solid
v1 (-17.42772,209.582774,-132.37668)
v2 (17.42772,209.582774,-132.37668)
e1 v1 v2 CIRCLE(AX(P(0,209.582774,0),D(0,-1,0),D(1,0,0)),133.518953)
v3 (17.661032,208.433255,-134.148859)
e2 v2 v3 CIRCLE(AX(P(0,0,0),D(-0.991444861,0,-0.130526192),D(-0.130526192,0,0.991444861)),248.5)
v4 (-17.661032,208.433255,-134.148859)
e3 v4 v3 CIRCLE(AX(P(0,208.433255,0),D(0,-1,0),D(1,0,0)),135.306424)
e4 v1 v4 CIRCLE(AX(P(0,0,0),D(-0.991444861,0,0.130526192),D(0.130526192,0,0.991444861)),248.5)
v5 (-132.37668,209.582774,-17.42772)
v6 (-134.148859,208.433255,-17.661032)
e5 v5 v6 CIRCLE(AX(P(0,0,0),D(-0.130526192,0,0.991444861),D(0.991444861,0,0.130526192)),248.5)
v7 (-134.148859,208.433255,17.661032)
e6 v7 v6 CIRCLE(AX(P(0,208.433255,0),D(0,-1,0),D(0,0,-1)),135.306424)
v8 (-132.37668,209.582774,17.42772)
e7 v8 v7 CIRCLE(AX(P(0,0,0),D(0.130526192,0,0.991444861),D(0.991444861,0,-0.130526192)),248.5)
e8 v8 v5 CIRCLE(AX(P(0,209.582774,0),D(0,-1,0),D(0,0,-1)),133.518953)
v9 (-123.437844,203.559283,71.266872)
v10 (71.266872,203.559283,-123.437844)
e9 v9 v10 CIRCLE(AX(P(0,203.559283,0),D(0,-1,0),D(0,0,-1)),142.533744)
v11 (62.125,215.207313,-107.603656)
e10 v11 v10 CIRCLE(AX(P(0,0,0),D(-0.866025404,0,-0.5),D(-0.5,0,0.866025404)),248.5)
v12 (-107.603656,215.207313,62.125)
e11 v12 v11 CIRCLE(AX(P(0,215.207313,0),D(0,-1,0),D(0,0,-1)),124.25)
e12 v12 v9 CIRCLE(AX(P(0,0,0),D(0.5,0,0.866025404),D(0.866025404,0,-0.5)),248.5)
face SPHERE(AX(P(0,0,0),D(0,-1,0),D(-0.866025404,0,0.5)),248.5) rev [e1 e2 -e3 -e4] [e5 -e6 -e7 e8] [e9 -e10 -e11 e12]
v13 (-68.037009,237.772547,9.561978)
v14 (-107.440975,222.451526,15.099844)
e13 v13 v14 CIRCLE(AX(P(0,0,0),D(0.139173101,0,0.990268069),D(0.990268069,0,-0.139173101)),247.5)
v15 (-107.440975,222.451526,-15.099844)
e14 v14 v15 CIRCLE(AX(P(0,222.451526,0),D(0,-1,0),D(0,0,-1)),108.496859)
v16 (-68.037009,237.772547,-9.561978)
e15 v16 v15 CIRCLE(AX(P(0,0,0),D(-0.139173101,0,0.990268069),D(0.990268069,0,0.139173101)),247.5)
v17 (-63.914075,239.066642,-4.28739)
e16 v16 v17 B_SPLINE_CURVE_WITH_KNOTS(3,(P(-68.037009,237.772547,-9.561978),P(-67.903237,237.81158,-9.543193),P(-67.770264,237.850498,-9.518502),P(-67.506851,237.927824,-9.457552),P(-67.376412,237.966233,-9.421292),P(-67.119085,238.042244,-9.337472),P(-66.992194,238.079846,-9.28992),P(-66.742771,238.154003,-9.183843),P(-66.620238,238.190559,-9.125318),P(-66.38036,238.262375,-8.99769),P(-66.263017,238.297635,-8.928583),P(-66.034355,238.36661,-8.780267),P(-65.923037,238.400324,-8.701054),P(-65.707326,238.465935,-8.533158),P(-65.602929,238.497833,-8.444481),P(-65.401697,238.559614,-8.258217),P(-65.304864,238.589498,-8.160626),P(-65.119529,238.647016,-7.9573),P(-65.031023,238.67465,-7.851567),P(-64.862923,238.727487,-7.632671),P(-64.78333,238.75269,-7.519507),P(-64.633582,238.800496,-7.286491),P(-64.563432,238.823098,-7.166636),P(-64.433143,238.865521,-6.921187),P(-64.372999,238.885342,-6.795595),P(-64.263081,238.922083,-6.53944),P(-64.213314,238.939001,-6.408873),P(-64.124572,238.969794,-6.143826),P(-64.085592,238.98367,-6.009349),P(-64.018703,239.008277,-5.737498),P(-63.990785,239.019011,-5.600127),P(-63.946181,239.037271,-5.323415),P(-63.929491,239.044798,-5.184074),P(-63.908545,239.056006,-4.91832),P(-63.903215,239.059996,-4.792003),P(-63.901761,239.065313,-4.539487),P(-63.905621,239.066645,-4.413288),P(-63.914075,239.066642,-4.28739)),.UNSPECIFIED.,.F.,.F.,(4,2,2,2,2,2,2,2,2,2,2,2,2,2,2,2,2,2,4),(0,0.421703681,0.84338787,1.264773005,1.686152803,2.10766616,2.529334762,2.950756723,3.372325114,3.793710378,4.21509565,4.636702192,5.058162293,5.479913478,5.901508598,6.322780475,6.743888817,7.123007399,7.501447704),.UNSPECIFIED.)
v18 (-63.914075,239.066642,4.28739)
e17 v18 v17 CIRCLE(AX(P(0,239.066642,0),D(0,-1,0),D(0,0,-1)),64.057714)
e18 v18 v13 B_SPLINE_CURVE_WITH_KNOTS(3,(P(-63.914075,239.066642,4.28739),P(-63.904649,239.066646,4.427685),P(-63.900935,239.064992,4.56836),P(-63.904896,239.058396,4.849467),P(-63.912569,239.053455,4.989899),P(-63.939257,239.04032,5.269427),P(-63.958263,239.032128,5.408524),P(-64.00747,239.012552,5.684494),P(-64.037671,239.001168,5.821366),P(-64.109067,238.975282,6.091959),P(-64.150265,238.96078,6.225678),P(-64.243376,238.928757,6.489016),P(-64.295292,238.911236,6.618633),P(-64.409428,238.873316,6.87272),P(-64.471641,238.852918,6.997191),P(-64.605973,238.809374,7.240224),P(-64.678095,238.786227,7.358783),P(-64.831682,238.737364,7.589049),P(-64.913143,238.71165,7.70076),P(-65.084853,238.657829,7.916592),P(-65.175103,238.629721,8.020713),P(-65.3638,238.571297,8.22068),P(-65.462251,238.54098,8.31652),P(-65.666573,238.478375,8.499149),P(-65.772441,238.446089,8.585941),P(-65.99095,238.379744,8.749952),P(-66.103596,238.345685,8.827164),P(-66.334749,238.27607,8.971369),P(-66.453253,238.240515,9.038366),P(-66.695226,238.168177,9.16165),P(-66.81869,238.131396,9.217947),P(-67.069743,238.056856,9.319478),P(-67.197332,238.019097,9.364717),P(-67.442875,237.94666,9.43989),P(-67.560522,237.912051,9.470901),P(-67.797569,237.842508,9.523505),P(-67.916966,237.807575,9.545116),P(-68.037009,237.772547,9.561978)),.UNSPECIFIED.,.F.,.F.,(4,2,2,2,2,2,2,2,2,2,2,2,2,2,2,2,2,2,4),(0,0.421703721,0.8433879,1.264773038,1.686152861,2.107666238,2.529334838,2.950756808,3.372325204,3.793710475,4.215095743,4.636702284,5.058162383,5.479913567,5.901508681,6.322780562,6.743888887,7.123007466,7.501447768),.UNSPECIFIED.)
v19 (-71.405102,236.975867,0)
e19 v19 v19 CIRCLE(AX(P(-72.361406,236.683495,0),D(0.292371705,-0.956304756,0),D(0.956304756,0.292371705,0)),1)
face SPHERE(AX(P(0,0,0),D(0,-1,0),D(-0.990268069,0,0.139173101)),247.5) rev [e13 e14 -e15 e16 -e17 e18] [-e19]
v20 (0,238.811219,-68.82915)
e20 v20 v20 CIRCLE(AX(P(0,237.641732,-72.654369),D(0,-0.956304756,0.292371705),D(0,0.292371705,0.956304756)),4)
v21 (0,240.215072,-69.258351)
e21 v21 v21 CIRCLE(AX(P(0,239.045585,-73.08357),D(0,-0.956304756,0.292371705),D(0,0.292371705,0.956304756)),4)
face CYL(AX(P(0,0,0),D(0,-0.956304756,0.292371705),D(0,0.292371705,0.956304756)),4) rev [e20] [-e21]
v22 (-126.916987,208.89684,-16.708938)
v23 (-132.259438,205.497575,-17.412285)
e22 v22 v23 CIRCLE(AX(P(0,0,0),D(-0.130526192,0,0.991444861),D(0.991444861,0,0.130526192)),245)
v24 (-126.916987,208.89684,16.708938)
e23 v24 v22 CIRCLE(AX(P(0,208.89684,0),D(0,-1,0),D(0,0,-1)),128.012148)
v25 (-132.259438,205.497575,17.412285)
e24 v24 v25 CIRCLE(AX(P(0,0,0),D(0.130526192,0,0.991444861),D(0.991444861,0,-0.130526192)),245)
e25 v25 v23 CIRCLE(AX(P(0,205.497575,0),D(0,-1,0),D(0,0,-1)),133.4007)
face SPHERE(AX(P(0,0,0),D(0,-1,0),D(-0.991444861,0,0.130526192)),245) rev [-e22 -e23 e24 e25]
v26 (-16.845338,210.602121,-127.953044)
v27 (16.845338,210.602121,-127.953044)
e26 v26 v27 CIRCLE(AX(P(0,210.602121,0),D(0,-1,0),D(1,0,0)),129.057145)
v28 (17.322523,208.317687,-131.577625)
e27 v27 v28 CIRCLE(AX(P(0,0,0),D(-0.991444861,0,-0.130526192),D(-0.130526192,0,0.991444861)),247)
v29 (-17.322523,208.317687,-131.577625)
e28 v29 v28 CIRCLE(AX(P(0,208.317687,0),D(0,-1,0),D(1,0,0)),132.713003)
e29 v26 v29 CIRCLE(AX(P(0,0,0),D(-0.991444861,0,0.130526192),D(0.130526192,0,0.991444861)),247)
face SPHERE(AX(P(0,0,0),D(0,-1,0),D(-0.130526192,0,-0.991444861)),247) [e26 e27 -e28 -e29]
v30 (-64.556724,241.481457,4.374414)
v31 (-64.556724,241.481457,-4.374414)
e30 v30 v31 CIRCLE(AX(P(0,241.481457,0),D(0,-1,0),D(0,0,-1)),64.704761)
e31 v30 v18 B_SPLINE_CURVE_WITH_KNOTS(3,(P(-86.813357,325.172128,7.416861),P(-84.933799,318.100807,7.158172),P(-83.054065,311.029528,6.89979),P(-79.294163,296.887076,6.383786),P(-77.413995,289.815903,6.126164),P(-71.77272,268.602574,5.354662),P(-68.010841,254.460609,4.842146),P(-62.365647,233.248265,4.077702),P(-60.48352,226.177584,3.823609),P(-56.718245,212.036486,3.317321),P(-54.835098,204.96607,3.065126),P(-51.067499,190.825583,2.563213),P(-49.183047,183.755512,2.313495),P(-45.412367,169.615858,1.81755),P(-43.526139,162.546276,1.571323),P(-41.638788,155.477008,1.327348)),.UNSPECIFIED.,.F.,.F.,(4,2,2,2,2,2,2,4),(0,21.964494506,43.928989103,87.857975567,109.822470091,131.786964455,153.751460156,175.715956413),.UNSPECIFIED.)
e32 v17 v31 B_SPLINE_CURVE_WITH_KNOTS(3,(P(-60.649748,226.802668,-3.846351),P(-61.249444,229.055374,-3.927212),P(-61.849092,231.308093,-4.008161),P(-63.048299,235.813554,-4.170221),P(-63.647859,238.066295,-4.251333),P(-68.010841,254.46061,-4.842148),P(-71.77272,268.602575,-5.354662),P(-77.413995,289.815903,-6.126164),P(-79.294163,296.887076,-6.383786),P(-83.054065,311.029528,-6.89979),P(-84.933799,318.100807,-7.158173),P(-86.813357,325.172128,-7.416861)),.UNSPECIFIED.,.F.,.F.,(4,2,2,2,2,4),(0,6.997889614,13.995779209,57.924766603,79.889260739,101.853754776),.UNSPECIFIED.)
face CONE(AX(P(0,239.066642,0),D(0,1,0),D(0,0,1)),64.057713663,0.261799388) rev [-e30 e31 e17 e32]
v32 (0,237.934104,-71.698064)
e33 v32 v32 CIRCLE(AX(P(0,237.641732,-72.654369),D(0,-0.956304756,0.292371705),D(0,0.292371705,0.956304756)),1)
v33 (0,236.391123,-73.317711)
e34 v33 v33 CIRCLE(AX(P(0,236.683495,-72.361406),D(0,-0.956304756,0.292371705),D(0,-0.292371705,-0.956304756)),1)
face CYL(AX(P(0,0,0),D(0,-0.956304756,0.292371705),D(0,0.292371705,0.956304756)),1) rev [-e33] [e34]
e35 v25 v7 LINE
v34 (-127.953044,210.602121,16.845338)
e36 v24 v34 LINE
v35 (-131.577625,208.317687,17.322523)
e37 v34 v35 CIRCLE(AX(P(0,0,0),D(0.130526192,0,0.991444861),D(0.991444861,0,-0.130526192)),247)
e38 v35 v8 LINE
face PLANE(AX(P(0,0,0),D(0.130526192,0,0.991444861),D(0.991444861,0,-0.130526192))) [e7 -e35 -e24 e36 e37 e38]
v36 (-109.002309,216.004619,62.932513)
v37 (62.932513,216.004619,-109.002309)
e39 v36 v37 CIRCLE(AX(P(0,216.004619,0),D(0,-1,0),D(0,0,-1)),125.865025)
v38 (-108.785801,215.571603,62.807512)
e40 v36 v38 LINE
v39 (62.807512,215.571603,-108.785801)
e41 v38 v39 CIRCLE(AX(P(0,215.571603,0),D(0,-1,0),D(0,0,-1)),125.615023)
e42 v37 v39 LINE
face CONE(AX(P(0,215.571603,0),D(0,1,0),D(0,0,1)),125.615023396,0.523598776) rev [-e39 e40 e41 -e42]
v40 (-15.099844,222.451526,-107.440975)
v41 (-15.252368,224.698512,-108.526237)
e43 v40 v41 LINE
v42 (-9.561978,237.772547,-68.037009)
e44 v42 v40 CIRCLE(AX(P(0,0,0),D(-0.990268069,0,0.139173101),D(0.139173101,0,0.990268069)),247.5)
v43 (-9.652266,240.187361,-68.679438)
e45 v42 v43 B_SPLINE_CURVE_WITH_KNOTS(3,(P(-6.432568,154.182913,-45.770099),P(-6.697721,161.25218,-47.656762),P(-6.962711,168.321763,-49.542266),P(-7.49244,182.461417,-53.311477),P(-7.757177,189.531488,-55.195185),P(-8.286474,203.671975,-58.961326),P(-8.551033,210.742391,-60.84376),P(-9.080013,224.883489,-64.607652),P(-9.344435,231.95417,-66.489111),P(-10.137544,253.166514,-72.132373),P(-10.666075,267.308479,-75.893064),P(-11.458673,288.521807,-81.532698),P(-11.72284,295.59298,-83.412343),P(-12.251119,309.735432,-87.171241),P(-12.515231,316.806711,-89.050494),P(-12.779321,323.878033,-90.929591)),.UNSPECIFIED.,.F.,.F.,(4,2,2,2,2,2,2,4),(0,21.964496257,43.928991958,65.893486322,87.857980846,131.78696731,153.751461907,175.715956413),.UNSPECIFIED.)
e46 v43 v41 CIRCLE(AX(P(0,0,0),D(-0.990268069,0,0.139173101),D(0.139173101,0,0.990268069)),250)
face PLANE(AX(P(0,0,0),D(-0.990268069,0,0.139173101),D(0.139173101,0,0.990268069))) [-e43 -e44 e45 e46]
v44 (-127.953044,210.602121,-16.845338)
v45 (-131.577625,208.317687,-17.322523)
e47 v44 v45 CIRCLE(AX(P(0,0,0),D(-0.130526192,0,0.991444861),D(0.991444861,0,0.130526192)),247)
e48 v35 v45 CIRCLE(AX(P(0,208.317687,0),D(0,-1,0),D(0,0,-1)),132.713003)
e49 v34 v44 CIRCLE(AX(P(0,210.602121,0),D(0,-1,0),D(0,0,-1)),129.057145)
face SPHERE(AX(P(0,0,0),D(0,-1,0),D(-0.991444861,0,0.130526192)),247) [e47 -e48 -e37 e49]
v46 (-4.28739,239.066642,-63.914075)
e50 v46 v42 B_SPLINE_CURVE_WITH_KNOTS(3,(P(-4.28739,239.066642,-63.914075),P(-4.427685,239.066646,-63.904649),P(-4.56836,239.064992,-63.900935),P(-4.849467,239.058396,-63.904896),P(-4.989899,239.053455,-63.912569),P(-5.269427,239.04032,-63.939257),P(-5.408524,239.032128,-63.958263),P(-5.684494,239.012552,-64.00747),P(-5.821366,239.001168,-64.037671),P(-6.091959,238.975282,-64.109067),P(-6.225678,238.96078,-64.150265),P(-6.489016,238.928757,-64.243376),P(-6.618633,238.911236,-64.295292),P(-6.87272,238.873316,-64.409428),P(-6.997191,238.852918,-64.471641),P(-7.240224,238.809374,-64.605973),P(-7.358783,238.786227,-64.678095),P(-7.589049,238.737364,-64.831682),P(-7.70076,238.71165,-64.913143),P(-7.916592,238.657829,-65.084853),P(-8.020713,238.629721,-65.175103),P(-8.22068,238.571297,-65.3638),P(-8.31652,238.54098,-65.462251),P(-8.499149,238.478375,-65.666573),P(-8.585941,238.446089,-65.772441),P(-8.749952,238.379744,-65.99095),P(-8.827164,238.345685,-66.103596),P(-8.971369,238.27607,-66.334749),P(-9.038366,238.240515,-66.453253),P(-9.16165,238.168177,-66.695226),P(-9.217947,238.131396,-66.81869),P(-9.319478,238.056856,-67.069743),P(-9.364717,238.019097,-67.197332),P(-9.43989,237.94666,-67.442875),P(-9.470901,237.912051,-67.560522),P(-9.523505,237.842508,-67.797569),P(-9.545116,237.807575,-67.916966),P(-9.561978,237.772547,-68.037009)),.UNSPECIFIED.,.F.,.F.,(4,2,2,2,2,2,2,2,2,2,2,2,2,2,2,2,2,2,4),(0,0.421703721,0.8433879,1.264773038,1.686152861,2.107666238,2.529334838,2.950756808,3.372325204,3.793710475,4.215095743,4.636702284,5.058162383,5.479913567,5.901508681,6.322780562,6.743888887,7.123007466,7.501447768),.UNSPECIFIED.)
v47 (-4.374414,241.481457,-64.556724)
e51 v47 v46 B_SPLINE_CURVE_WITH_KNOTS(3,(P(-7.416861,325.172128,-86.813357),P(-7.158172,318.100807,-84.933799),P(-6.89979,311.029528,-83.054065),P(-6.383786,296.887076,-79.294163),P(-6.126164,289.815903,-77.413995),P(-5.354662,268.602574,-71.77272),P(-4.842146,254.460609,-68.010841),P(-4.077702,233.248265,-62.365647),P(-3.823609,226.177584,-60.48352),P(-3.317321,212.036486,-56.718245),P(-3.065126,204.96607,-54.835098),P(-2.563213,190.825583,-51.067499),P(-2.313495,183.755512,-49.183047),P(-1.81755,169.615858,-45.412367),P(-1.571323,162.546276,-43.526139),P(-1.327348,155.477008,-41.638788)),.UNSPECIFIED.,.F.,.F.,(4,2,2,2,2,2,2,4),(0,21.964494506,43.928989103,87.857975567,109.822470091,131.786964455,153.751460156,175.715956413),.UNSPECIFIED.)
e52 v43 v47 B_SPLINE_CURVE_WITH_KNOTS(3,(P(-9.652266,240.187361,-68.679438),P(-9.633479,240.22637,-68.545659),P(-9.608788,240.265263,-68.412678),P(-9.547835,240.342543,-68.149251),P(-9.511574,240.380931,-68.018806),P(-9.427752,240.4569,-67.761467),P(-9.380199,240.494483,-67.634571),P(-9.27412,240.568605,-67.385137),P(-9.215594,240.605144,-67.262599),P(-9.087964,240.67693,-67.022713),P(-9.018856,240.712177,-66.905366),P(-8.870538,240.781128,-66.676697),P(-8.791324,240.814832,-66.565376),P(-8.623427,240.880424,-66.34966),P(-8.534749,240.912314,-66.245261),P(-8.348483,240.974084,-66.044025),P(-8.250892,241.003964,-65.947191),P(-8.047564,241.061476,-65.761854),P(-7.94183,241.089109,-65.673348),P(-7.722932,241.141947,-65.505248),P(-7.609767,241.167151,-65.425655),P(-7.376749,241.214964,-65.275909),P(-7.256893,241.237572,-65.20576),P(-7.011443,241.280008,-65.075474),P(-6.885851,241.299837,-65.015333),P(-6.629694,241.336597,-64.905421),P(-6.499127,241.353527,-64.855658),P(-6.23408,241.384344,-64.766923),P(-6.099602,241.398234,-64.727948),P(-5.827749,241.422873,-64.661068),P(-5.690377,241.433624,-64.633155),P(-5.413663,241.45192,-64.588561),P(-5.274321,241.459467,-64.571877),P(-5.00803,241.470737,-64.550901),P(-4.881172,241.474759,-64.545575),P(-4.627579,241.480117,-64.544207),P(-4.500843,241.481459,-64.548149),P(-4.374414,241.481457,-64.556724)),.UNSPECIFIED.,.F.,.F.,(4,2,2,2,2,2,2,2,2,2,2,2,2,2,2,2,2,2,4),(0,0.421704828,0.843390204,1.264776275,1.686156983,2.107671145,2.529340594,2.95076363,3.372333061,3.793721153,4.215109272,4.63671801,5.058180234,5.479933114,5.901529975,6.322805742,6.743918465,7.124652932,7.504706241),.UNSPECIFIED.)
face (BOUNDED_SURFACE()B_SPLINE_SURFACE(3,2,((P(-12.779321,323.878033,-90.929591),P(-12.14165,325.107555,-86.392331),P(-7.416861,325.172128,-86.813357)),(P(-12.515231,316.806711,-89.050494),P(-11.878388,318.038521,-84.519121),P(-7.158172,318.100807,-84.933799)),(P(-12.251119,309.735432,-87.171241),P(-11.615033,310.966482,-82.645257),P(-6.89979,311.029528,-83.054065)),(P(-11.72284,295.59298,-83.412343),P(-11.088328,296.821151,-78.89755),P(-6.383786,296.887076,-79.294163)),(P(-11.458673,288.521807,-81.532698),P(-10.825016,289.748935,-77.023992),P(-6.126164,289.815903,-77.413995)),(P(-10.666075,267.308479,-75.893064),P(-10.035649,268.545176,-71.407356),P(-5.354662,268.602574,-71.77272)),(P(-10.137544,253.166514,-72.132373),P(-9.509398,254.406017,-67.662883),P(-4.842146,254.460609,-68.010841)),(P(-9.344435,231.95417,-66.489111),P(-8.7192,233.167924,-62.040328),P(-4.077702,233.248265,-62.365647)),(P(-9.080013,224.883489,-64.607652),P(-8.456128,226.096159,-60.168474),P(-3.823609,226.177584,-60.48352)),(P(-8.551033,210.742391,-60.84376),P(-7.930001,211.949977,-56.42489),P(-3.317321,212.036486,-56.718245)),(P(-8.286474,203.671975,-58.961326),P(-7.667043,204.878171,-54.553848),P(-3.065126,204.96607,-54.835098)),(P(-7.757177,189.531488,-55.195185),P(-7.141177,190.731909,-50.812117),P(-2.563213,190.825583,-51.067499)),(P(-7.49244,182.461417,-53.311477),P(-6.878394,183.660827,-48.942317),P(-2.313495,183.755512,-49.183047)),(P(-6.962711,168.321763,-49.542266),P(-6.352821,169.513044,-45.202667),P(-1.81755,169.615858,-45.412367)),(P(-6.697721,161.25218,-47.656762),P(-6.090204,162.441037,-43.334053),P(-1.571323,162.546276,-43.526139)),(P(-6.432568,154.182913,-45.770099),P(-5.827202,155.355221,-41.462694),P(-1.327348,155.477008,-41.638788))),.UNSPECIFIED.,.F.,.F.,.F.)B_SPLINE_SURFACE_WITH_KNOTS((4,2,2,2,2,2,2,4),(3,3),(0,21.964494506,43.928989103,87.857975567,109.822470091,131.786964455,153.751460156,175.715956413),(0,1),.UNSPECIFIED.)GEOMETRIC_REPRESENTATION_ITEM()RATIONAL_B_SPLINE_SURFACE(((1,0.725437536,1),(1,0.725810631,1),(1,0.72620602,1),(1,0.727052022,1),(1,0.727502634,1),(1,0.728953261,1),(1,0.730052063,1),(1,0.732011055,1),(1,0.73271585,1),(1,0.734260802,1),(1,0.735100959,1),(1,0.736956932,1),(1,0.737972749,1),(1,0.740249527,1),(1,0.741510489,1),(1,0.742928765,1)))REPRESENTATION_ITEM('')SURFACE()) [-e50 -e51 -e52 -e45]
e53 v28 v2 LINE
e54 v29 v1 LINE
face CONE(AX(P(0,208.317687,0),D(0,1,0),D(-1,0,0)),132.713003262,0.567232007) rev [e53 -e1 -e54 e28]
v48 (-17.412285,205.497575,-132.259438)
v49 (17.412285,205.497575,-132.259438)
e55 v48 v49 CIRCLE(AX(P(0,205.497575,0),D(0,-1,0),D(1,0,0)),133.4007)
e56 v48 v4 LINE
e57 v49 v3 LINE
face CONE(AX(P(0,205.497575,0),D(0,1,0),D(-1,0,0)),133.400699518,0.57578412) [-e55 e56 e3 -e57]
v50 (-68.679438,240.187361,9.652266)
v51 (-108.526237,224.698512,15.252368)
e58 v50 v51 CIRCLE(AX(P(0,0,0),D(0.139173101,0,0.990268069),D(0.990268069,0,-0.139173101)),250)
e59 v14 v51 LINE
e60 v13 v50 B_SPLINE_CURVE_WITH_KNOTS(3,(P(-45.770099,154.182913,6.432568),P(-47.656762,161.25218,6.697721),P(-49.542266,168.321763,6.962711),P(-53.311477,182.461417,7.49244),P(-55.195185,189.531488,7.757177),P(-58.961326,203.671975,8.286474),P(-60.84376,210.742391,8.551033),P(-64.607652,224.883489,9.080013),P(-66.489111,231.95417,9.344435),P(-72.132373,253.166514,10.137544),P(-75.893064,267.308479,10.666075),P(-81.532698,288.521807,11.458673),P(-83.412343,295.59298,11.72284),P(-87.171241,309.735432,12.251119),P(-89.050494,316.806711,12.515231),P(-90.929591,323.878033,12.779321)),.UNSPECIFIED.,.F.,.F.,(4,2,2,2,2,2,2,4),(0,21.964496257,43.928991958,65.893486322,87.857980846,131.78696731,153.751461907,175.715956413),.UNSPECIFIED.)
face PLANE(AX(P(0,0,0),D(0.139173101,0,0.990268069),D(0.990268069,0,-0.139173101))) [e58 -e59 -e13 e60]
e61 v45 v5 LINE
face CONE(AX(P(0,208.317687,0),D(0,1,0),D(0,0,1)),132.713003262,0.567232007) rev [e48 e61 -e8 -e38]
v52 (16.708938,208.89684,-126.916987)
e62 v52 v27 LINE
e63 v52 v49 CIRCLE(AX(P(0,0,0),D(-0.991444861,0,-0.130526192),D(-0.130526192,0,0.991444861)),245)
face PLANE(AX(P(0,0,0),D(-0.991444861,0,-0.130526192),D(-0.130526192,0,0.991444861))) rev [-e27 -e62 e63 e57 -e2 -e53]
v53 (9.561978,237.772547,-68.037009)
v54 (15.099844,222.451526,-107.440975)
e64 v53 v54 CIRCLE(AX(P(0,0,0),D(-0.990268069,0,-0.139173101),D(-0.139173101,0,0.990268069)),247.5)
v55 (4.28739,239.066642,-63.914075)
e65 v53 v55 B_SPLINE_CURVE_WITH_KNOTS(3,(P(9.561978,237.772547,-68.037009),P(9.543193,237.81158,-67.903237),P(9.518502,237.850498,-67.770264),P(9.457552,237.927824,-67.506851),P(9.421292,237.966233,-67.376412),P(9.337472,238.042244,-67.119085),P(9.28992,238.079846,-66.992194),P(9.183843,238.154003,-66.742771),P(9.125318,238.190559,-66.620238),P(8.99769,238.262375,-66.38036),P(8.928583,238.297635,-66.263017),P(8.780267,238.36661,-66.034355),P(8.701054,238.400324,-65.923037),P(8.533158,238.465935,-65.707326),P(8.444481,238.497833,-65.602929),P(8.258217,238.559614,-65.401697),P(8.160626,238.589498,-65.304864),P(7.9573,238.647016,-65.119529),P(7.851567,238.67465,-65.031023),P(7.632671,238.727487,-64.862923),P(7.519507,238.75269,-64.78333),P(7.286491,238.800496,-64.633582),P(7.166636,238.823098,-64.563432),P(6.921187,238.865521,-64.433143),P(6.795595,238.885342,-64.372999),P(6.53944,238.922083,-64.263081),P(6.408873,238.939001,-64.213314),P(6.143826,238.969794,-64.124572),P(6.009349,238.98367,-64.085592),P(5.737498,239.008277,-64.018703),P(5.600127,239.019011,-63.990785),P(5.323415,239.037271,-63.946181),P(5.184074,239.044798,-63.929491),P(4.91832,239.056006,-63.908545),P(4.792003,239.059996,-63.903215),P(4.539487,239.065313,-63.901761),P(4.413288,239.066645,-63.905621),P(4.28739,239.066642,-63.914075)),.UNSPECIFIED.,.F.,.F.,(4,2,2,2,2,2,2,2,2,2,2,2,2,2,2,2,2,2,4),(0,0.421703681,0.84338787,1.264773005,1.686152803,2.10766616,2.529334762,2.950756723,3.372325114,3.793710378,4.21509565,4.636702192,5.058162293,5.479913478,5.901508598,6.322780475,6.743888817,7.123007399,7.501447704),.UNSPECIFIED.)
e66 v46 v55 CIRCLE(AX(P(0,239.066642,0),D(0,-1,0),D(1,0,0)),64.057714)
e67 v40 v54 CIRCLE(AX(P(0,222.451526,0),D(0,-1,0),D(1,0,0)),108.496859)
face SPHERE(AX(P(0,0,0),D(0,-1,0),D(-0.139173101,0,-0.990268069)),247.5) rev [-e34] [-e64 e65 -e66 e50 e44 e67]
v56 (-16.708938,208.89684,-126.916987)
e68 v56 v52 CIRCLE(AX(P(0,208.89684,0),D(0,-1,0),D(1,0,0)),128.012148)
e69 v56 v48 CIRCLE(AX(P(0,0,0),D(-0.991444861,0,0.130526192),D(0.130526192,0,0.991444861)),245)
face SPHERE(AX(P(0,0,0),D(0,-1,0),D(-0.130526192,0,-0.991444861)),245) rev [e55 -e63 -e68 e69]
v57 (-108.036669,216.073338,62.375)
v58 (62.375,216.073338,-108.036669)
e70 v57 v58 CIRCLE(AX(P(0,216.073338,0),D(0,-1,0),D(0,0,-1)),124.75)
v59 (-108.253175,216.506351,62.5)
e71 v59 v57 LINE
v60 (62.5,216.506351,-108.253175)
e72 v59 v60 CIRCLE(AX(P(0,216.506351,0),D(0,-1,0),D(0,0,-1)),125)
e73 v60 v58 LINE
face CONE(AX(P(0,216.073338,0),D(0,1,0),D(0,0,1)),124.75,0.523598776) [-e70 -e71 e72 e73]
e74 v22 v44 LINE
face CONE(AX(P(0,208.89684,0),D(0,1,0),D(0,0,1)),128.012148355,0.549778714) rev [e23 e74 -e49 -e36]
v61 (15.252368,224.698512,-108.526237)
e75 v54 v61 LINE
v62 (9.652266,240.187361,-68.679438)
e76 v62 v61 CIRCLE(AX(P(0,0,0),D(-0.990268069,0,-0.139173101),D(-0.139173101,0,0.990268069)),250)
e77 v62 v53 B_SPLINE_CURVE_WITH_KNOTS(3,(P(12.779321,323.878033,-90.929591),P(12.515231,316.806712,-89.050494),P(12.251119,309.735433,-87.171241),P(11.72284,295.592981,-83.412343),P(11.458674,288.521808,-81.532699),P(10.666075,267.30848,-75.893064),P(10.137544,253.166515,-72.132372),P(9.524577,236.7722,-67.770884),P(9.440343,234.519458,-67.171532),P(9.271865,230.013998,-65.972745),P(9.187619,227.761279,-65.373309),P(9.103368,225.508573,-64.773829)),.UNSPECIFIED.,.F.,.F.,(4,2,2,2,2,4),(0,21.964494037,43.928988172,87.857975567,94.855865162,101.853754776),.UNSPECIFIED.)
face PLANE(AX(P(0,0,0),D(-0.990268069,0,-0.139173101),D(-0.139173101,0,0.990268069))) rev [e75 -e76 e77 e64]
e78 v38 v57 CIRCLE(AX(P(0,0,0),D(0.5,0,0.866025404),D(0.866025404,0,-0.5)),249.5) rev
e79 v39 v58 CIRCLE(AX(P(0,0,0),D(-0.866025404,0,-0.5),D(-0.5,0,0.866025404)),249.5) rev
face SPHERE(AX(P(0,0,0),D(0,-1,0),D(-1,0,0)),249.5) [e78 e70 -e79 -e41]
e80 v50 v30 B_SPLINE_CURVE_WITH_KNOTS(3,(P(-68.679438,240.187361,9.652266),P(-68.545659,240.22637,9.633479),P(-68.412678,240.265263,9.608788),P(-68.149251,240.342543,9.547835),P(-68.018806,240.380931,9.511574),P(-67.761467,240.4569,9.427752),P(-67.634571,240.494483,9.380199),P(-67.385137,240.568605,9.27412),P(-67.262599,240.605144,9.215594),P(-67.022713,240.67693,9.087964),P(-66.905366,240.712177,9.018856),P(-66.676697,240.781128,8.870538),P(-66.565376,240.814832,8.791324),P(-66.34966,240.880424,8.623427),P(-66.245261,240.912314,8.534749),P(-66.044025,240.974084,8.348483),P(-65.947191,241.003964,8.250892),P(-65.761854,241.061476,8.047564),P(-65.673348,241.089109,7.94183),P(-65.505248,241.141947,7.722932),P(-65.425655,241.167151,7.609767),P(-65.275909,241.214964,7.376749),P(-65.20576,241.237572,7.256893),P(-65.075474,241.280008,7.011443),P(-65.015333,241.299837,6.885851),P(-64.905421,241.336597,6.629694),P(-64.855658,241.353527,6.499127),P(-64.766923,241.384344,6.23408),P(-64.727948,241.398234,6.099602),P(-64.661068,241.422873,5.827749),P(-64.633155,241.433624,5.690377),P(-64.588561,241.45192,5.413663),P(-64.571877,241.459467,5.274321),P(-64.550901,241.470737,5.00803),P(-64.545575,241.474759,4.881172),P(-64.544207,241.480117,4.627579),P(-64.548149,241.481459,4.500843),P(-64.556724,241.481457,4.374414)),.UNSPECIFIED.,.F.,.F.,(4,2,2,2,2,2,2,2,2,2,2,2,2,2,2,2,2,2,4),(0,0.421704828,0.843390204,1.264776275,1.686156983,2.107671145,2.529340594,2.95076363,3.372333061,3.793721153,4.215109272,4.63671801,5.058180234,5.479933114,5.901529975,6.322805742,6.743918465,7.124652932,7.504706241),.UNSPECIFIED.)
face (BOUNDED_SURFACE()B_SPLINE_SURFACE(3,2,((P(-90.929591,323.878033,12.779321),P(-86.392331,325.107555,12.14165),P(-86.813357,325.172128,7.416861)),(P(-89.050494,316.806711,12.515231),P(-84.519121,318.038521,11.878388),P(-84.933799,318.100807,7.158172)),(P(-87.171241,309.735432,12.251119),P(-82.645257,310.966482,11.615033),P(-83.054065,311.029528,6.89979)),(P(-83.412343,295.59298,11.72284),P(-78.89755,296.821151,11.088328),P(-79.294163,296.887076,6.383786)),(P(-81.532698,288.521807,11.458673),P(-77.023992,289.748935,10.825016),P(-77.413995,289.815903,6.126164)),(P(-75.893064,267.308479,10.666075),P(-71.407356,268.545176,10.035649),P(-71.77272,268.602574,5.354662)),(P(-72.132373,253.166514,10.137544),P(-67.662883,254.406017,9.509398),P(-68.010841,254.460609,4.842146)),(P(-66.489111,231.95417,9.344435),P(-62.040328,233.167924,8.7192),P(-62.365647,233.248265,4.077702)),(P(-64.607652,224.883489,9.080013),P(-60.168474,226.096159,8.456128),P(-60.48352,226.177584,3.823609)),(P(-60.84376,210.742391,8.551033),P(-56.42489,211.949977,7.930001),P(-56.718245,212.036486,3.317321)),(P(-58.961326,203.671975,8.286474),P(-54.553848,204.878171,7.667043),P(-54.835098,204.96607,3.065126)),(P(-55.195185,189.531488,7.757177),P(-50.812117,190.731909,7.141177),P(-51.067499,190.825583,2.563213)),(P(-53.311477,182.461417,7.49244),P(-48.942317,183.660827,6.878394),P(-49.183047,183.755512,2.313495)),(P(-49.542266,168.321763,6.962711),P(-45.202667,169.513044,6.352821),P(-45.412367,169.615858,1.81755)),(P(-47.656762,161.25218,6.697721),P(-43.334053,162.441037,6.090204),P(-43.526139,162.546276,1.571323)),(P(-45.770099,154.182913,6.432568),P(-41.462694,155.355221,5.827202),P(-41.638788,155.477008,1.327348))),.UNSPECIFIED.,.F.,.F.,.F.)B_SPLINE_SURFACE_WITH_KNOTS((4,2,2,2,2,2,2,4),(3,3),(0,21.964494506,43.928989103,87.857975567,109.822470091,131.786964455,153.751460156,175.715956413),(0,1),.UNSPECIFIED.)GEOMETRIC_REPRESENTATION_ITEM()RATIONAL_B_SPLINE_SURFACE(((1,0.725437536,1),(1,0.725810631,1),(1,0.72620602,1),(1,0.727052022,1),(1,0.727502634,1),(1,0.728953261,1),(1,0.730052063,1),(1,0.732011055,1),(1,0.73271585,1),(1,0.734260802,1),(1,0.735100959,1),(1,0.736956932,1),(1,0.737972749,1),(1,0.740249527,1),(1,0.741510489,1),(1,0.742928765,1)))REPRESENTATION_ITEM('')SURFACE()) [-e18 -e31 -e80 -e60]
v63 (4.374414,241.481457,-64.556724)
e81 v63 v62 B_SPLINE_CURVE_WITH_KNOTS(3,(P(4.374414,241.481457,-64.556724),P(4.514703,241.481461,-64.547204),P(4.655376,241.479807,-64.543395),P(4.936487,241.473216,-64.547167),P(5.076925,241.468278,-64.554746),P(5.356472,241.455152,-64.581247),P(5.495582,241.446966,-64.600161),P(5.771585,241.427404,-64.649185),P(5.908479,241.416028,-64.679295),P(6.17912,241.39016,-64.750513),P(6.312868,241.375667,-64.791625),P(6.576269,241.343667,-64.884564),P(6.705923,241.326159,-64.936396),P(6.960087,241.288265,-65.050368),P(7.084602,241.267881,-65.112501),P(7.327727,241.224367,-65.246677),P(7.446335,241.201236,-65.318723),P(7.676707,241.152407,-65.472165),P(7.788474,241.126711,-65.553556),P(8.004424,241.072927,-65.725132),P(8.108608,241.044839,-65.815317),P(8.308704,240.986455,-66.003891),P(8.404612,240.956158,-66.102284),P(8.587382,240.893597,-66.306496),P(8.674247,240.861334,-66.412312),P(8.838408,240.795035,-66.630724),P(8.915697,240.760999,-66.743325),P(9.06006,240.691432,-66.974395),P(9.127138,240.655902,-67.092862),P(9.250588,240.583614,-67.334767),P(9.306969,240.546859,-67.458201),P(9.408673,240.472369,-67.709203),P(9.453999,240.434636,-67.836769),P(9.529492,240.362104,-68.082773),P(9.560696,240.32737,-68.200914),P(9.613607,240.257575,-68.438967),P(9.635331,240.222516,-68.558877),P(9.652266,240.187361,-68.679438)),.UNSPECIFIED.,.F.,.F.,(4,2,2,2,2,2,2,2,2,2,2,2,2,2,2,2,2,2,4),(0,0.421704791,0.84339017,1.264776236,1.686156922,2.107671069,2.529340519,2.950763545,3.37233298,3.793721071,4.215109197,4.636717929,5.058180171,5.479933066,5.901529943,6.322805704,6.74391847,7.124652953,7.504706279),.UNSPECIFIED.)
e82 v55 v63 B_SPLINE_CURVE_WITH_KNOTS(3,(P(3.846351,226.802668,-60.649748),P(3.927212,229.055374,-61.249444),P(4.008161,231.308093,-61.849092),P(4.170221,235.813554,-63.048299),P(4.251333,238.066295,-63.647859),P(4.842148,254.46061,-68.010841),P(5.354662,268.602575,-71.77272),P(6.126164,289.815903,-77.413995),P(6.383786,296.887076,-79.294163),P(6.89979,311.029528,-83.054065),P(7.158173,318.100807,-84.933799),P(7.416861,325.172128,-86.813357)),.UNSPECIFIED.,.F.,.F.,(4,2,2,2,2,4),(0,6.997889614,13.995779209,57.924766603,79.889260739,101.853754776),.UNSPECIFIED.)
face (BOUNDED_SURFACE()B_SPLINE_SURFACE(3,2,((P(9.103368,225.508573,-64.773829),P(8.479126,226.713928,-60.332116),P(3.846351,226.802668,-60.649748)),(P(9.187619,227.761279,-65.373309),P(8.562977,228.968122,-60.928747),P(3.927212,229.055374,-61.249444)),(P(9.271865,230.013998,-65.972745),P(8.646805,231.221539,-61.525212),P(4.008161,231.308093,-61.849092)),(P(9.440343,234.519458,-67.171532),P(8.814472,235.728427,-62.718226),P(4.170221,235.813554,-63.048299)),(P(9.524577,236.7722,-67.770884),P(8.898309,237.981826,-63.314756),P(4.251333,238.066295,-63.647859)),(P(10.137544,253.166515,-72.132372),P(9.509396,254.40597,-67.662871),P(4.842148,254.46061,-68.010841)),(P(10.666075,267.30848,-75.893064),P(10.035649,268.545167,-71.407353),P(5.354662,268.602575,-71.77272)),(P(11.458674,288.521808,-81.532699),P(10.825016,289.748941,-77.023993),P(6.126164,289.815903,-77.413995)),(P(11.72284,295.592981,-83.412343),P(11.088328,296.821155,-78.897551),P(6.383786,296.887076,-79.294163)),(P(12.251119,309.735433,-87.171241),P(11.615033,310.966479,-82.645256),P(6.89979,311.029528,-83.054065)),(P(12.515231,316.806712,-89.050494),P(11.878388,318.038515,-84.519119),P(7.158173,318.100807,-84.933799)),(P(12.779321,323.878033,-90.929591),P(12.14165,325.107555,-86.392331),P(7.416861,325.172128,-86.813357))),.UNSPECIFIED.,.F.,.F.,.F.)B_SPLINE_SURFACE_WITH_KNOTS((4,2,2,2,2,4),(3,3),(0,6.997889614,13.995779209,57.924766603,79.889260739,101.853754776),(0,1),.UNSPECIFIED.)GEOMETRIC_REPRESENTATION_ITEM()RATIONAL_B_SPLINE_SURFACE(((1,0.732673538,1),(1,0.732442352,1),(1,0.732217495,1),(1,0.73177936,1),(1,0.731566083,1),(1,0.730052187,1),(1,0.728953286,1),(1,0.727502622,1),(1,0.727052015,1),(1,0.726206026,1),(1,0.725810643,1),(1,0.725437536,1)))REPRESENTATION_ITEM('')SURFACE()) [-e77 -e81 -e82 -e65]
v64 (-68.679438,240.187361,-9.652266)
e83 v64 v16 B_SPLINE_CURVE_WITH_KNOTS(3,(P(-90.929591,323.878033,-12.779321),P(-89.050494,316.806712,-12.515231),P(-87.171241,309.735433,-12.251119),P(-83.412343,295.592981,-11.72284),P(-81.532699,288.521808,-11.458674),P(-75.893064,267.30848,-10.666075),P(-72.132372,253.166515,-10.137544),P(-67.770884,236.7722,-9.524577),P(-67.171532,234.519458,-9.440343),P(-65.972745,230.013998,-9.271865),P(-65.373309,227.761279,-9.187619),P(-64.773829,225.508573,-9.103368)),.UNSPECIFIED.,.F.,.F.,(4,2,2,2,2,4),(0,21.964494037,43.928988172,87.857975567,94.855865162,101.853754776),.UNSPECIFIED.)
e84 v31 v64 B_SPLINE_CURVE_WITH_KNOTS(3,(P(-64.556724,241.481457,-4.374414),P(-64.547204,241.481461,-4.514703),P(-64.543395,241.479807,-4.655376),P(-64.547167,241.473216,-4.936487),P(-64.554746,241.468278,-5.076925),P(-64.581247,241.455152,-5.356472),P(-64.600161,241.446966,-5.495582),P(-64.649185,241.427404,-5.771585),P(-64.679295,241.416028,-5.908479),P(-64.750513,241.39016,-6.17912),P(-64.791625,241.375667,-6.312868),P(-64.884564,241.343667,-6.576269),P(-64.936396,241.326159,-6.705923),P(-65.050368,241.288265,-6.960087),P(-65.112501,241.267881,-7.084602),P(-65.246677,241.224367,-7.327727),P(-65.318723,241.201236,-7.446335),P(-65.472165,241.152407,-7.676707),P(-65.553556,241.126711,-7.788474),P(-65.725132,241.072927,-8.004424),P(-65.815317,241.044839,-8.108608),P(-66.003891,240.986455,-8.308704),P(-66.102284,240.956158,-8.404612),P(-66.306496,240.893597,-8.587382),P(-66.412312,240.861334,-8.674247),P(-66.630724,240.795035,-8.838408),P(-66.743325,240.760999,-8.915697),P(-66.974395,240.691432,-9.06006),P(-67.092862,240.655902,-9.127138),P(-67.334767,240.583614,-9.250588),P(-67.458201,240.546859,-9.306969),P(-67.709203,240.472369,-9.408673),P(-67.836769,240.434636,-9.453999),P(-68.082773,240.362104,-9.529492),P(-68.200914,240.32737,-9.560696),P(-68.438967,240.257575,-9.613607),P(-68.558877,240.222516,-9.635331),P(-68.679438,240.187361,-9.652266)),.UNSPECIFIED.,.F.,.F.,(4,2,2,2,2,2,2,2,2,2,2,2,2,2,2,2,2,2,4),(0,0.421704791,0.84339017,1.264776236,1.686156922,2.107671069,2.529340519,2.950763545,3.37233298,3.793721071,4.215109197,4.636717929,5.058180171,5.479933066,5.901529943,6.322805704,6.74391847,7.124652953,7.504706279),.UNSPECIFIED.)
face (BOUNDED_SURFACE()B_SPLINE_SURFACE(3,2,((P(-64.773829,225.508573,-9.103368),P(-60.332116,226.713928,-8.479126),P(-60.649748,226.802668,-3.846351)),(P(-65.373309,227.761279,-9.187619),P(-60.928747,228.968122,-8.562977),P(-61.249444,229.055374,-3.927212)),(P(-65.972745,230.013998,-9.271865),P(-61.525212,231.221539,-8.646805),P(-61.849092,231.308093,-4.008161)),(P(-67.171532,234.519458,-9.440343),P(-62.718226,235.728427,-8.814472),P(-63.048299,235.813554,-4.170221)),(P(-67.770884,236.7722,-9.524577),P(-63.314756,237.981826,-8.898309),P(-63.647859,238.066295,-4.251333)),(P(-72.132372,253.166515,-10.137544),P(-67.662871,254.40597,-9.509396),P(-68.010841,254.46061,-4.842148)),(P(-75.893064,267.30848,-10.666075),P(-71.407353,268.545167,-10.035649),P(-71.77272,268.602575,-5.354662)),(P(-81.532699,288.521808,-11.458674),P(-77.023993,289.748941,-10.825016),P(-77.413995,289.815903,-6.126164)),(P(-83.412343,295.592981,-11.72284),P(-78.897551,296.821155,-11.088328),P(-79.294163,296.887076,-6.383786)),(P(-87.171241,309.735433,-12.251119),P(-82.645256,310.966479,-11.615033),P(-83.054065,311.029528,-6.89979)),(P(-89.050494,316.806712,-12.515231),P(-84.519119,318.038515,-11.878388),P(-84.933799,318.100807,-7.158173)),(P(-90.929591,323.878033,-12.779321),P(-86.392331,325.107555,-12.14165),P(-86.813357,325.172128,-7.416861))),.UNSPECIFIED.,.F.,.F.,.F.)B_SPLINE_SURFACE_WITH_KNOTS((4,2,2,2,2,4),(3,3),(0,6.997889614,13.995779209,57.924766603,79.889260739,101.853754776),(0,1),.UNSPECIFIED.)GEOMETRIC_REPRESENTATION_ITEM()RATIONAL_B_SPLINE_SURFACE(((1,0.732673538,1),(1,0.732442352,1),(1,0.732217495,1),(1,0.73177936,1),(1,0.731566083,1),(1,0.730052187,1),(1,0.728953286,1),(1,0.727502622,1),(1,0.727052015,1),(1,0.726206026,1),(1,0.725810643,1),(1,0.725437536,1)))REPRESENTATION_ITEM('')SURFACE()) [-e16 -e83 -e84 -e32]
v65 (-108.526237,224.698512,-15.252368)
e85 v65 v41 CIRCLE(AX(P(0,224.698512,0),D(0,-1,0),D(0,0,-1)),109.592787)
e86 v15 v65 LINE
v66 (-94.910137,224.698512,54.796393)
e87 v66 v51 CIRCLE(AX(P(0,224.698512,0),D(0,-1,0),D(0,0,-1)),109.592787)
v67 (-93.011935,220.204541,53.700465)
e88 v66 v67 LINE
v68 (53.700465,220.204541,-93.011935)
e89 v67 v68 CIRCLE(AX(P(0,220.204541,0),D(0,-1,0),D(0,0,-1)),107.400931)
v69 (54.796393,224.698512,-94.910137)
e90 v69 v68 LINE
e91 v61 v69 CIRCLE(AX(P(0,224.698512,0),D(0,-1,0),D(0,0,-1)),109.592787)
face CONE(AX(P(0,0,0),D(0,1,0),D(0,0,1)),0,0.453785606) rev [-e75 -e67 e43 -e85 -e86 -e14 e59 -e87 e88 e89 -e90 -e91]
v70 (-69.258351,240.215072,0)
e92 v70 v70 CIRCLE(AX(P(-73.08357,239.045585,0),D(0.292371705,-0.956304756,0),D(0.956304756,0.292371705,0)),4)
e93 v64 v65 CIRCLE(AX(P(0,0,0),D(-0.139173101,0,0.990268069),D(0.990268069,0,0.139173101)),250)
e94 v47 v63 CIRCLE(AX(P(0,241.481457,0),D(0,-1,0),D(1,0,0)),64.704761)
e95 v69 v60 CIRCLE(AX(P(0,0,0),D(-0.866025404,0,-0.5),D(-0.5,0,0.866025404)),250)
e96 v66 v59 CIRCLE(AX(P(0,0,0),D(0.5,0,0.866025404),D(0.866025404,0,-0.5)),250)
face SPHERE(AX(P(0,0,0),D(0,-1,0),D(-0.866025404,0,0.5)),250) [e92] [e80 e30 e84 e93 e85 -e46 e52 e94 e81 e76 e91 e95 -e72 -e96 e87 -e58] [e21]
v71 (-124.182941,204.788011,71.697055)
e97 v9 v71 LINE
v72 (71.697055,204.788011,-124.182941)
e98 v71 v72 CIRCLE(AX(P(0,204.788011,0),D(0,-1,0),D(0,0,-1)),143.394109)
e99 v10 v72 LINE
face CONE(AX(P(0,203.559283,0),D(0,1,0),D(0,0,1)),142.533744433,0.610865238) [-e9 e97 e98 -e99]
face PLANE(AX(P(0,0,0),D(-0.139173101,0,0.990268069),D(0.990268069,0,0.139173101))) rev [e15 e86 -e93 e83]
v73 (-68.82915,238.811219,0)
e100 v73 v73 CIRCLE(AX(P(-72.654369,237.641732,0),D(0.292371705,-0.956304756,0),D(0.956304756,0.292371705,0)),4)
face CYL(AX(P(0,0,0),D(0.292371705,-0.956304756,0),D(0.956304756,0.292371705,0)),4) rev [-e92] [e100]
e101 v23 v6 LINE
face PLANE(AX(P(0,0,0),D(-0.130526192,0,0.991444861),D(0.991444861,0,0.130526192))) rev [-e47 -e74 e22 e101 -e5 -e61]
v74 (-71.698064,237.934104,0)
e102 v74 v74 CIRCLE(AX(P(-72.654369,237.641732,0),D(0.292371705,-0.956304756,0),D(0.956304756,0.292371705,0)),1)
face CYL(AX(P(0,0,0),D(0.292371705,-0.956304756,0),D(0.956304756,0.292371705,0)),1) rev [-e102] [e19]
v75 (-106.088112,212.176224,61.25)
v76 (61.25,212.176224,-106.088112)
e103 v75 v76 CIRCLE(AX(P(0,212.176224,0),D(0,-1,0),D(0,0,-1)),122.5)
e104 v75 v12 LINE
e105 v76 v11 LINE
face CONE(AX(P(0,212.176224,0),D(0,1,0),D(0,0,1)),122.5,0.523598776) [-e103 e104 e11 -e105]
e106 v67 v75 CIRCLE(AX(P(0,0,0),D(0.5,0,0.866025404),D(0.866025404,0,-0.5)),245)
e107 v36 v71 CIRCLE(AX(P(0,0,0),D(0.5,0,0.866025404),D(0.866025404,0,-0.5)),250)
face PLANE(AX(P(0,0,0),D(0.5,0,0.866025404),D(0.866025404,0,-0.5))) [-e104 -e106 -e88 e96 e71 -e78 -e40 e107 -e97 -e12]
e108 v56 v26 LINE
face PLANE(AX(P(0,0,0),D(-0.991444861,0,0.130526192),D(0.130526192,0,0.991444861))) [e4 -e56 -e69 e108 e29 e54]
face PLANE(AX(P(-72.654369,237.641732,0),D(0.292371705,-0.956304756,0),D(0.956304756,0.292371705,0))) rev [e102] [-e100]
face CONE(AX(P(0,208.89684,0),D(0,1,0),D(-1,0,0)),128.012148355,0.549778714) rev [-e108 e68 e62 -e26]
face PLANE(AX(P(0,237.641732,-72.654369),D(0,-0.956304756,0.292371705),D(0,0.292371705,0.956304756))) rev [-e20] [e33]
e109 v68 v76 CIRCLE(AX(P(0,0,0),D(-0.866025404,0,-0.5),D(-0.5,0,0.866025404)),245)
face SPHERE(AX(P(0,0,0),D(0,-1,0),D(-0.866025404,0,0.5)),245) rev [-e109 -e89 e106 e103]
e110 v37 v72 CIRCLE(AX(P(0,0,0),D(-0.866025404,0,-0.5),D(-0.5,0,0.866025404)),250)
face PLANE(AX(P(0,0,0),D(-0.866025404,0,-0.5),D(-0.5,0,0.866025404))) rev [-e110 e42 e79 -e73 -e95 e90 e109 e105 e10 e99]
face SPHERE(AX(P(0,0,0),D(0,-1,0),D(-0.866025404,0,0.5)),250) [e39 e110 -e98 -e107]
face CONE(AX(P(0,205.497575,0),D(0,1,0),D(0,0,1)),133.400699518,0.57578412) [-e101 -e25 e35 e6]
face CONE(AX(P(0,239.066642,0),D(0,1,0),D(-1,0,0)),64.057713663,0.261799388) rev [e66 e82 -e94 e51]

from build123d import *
from build123d.topology import SkipClean

# Parameters (mm, degrees)
REVOLVE1_ANGLE           = 30
REVOLVE1_OTHER_WAY_ANGLE = 120
REVOLVE2_ANGLE           = 15
CIRPATTERN1_COUNT        = 4
REVOLVE4_ANGLE           = 16
CUT_REVOLVE4_START       = -250
CUT_REVOLVE4_OUTLINE_R   = 4
CUT_REVOLVE4_DEPTH       = 1.5
CUT_REVOLVE4_START_2     = -248.5
CUT_REVOLVE4_2_OUTLINE_R = 1
CUT_REVOLVE4_2_DEPTH     = 1.00202
FILLET2_R                = 5
CIRPATTERN5_COUNT        = 2
CIRPATTERN5_ANGLE        = 90
FILLET2_OF_CIRPATTERN5_R = 5


# Read off the part's stored shape, not the designer's step: Revolve2, Revolve4, Cut-Revolve4
with BuildPart() as part:
    # Sketch1 → Revolve1 (revolve)
    with BuildSketch(Plane.XY):
        with BuildLine():
            ThreePointArc((-142.533744, 203.559283), (-133.518953, 209.582774), (-124.25, 215.207313))
            Line((-124.25, 215.207313), (-125, 216.506351))
            ThreePointArc((-125, 216.506351), (-134.324902, 210.847861), (-143.394109, 204.788011))
            Line((-143.394109, 204.788011), (-142.533744, 203.559283))
        make_face()
        with BuildLine():
            ThreePointArc((-124.25, 215.207313), (-64.316533, 240.032568), (0, 248.5))
            Line((0, 248.5), (0, 250))
            ThreePointArc((0, 250), (-64.704761, 241.481457), (-125, 216.506351))
            Line((-125, 216.506351), (-124.25, 215.207313))
        make_face()
        with BuildLine():
            ThreePointArc((-122.5, 212.176224), (-63.410666, 236.651827), (0, 245))
            Line((0, 245), (0, 248.5))
            ThreePointArc((0, 248.5), (-64.316533, 240.032568), (-124.25, 215.207313))
            Line((-124.25, 215.207313), (-122.5, 212.176224))
        make_face()
    revolve(axis=Axis((0, 0, 0), (0, 1, 0)), revolution_arc=REVOLVE1_ANGLE)

    # Sketch1 → Revolve1 other way (revolve)
    with SkipClean():  # the faces are left unmerged after this step: merging them gives an invalid solid
        with BuildSketch(Plane.XY):
            with BuildLine():
                ThreePointArc((-142.533744, 203.559283), (-133.518953, 209.582774), (-124.25, 215.207313))
                Line((-124.25, 215.207313), (-125, 216.506351))
                ThreePointArc((-125, 216.506351), (-134.324902, 210.847861), (-143.394109, 204.788011))
                Line((-143.394109, 204.788011), (-142.533744, 203.559283))
            make_face()
            with BuildLine():
                ThreePointArc((-124.25, 215.207313), (-64.316533, 240.032568), (0, 248.5))
                Line((0, 248.5), (0, 250))
                ThreePointArc((0, 250), (-64.704761, 241.481457), (-125, 216.506351))
                Line((-125, 216.506351), (-124.25, 215.207313))
            make_face()
            with BuildLine():
                ThreePointArc((-122.5, 212.176224), (-63.410666, 236.651827), (0, 245))
                Line((0, 245), (0, 248.5))
                ThreePointArc((0, 248.5), (-64.316533, 240.032568), (-124.25, 215.207313))
                Line((-124.25, 215.207313), (-122.5, 212.176224))
            make_face()
        revolve(axis=Axis((0, 0, 0), (0, -1, 0)), revolution_arc=REVOLVE1_OTHER_WAY_ANGLE)

    # Revolve2 outline → Revolve2 (revolve)
    with SkipClean():  # the faces are left unmerged after this step: merging them gives an invalid solid
        with BuildSketch(Plane(origin=(0, 0, 0), x_dir=(-0.9914448613738103, 0, -0.13052619222005243), z_dir=(0.13052619222005243, 0, -0.9914448613738103))):
            with BuildLine():
                Line((133.4007, 205.497575), (135.306424, 208.433255))
                Line((135.306424, 208.433255), (135.306424, 209.582774))
                Line((135.306424, 209.582774), (133.518953, 209.582774))
                Line((133.518953, 209.582774), (132.713003, 208.317687))
                ThreePointArc((132.713003, 208.317687), (130.890058, 209.46788), (129.057145, 210.602121))
                Line((129.057145, 210.602121), (128.012148, 208.89684))
                ThreePointArc((128.012148, 208.89684), (130.717474, 207.214724), (133.4007, 205.497575))
            make_face()
        revolve2 = revolve(axis=Axis((0, 0, 0), (0, 1, 0)), revolution_arc=REVOLVE2_ANGLE)

    # CirPattern1: Revolve2 ×4 about axis, 2 skipped
    with SkipClean():  # the faces are left unmerged after this step: merging them gives an invalid solid
        cirpattern1_axis = Axis((0, 0, 0), (0, -1, 0))
        add([revolve2.rotate(cirpattern1_axis, i * 360 / CIRPATTERN1_COUNT) for i in range(1, CIRPATTERN1_COUNT) if i not in (2, 3)])

    # Sketch4 → Cut-Revolve1 (revolve, cut)
    with BuildSketch(Plane.XY):
        with BuildLine():
            Line((0, 250), (0, 0))
            Line((0, 0), (109.592787, 224.698512))
            ThreePointArc((109.592787, 224.698512), (56.237764, 243.592516), (0, 250))
        make_face()
    revolve(axis=Axis((0, 0, 0), (0, 1, 0)), mode=Mode.SUBTRACT)

    # Revolve4 outline → Revolve4 (revolve)
    with BuildSketch(Plane(origin=(0, 0, 0), x_dir=(-0.9902680687415703, 0, -0.13917310096006574), z_dir=(0.13917310096006574, 0, -0.9902680687415703))):
        with BuildLine():
            Line((108.496859, 222.451526), (114.084698, 222.451526))
            ThreePointArc((114.084698, 222.451526), (89.899679, 233.276762), (64.704761, 241.481457))
            Line((64.704761, 241.481457), (64.057714, 239.066642))
            ThreePointArc((64.057714, 239.066642), (86.676327, 231.826367), (108.496859, 222.451526))
        make_face()
    revolve4 = revolve(axis=Axis((0, 0, 0), (0, 1, 0)), revolution_arc=REVOLVE4_ANGLE)

    # Cut-Revolve4 outline → Cut-Revolve4 (cut)
    with BuildSketch(Plane(origin=(0, 0, 0), x_dir=(0.956304755963035, 0.29237170472273805, 0), z_dir=(0.29237170472273805, -0.9563047559630351, 0)).offset(CUT_REVOLVE4_START)):
        Circle(CUT_REVOLVE4_OUTLINE_R)
    cut_revolve4 = extrude(amount=CUT_REVOLVE4_DEPTH, mode=Mode.SUBTRACT)

    # Cut-Revolve4 2 outline → Cut-Revolve4 2 (cut)
    with BuildSketch(Plane(origin=(0, 0, 0), x_dir=(0.956304755963035, 0.29237170472273805, 0), z_dir=(0.29237170472273805, -0.9563047559630351, 0)).offset(CUT_REVOLVE4_START_2)):
        Circle(CUT_REVOLVE4_2_OUTLINE_R)
    cut_revolve4_2 = extrude(amount=CUT_REVOLVE4_2_DEPTH, mode=Mode.SUBTRACT)

    # Fillet2
    fillet2_edges = [part.edges().sort_by_distance(p)[0] for p in [
        (-63.754684, 240.274049, -8.960136),
        (-63.754684, 240.274049, 8.960136),
    ]]
    fillet(fillet2_edges, radius=FILLET2_R)

    # CirPattern5: Revolve4, Cut-Revolve4, Cut-Revolve4 2 ×2 about axis
    cirpattern5_axis = Axis((0, 0, 0), (0, -1, 0))
    add([revolve4.rotate(cirpattern5_axis, i * CIRPATTERN5_ANGLE / (CIRPATTERN5_COUNT - 1)) for i in range(1, CIRPATTERN5_COUNT)])
    add([cut_revolve4.rotate(cirpattern5_axis, i * CIRPATTERN5_ANGLE / (CIRPATTERN5_COUNT - 1)) for i in range(1, CIRPATTERN5_COUNT)], mode=Mode.SUBTRACT)
    add([cut_revolve4_2.rotate(cirpattern5_axis, i * CIRPATTERN5_ANGLE / (CIRPATTERN5_COUNT - 1)) for i in range(1, CIRPATTERN5_COUNT)], mode=Mode.SUBTRACT)

    # Fillet2 of CirPattern5
    fillet2_of_cirpattern5_edges = [part.edges().sort_by_distance(p)[0] for p in [
        (8.960136, 240.274049, -63.754684),
        (-8.960136, 240.274049, -63.754684),
    ]]
    fillet(fillet2_of_cirpattern5_edges, radius=FILLET2_OF_CIRPATTERN5_R)

    # Sketch11 → Cut-Revolve5 (revolve, cut)
    with BuildSketch(Plane.XY):
        with BuildLine():
            ThreePointArc((-125.615023, 215.571603), (-125.182763, 215.822904), (-124.75, 216.073338))
            Line((-124.75, 216.073338), (-125, 216.506351))
            ThreePointArc((-125, 216.506351), (-125.432764, 216.255917), (-125.865025, 216.004619))
            Line((-125.865025, 216.004619), (-125.615023, 215.571603))
        make_face()
    revolve(axis=Axis((0, 0, 0), (0, 1, 0)), mode=Mode.SUBTRACT)


solid = part.part
